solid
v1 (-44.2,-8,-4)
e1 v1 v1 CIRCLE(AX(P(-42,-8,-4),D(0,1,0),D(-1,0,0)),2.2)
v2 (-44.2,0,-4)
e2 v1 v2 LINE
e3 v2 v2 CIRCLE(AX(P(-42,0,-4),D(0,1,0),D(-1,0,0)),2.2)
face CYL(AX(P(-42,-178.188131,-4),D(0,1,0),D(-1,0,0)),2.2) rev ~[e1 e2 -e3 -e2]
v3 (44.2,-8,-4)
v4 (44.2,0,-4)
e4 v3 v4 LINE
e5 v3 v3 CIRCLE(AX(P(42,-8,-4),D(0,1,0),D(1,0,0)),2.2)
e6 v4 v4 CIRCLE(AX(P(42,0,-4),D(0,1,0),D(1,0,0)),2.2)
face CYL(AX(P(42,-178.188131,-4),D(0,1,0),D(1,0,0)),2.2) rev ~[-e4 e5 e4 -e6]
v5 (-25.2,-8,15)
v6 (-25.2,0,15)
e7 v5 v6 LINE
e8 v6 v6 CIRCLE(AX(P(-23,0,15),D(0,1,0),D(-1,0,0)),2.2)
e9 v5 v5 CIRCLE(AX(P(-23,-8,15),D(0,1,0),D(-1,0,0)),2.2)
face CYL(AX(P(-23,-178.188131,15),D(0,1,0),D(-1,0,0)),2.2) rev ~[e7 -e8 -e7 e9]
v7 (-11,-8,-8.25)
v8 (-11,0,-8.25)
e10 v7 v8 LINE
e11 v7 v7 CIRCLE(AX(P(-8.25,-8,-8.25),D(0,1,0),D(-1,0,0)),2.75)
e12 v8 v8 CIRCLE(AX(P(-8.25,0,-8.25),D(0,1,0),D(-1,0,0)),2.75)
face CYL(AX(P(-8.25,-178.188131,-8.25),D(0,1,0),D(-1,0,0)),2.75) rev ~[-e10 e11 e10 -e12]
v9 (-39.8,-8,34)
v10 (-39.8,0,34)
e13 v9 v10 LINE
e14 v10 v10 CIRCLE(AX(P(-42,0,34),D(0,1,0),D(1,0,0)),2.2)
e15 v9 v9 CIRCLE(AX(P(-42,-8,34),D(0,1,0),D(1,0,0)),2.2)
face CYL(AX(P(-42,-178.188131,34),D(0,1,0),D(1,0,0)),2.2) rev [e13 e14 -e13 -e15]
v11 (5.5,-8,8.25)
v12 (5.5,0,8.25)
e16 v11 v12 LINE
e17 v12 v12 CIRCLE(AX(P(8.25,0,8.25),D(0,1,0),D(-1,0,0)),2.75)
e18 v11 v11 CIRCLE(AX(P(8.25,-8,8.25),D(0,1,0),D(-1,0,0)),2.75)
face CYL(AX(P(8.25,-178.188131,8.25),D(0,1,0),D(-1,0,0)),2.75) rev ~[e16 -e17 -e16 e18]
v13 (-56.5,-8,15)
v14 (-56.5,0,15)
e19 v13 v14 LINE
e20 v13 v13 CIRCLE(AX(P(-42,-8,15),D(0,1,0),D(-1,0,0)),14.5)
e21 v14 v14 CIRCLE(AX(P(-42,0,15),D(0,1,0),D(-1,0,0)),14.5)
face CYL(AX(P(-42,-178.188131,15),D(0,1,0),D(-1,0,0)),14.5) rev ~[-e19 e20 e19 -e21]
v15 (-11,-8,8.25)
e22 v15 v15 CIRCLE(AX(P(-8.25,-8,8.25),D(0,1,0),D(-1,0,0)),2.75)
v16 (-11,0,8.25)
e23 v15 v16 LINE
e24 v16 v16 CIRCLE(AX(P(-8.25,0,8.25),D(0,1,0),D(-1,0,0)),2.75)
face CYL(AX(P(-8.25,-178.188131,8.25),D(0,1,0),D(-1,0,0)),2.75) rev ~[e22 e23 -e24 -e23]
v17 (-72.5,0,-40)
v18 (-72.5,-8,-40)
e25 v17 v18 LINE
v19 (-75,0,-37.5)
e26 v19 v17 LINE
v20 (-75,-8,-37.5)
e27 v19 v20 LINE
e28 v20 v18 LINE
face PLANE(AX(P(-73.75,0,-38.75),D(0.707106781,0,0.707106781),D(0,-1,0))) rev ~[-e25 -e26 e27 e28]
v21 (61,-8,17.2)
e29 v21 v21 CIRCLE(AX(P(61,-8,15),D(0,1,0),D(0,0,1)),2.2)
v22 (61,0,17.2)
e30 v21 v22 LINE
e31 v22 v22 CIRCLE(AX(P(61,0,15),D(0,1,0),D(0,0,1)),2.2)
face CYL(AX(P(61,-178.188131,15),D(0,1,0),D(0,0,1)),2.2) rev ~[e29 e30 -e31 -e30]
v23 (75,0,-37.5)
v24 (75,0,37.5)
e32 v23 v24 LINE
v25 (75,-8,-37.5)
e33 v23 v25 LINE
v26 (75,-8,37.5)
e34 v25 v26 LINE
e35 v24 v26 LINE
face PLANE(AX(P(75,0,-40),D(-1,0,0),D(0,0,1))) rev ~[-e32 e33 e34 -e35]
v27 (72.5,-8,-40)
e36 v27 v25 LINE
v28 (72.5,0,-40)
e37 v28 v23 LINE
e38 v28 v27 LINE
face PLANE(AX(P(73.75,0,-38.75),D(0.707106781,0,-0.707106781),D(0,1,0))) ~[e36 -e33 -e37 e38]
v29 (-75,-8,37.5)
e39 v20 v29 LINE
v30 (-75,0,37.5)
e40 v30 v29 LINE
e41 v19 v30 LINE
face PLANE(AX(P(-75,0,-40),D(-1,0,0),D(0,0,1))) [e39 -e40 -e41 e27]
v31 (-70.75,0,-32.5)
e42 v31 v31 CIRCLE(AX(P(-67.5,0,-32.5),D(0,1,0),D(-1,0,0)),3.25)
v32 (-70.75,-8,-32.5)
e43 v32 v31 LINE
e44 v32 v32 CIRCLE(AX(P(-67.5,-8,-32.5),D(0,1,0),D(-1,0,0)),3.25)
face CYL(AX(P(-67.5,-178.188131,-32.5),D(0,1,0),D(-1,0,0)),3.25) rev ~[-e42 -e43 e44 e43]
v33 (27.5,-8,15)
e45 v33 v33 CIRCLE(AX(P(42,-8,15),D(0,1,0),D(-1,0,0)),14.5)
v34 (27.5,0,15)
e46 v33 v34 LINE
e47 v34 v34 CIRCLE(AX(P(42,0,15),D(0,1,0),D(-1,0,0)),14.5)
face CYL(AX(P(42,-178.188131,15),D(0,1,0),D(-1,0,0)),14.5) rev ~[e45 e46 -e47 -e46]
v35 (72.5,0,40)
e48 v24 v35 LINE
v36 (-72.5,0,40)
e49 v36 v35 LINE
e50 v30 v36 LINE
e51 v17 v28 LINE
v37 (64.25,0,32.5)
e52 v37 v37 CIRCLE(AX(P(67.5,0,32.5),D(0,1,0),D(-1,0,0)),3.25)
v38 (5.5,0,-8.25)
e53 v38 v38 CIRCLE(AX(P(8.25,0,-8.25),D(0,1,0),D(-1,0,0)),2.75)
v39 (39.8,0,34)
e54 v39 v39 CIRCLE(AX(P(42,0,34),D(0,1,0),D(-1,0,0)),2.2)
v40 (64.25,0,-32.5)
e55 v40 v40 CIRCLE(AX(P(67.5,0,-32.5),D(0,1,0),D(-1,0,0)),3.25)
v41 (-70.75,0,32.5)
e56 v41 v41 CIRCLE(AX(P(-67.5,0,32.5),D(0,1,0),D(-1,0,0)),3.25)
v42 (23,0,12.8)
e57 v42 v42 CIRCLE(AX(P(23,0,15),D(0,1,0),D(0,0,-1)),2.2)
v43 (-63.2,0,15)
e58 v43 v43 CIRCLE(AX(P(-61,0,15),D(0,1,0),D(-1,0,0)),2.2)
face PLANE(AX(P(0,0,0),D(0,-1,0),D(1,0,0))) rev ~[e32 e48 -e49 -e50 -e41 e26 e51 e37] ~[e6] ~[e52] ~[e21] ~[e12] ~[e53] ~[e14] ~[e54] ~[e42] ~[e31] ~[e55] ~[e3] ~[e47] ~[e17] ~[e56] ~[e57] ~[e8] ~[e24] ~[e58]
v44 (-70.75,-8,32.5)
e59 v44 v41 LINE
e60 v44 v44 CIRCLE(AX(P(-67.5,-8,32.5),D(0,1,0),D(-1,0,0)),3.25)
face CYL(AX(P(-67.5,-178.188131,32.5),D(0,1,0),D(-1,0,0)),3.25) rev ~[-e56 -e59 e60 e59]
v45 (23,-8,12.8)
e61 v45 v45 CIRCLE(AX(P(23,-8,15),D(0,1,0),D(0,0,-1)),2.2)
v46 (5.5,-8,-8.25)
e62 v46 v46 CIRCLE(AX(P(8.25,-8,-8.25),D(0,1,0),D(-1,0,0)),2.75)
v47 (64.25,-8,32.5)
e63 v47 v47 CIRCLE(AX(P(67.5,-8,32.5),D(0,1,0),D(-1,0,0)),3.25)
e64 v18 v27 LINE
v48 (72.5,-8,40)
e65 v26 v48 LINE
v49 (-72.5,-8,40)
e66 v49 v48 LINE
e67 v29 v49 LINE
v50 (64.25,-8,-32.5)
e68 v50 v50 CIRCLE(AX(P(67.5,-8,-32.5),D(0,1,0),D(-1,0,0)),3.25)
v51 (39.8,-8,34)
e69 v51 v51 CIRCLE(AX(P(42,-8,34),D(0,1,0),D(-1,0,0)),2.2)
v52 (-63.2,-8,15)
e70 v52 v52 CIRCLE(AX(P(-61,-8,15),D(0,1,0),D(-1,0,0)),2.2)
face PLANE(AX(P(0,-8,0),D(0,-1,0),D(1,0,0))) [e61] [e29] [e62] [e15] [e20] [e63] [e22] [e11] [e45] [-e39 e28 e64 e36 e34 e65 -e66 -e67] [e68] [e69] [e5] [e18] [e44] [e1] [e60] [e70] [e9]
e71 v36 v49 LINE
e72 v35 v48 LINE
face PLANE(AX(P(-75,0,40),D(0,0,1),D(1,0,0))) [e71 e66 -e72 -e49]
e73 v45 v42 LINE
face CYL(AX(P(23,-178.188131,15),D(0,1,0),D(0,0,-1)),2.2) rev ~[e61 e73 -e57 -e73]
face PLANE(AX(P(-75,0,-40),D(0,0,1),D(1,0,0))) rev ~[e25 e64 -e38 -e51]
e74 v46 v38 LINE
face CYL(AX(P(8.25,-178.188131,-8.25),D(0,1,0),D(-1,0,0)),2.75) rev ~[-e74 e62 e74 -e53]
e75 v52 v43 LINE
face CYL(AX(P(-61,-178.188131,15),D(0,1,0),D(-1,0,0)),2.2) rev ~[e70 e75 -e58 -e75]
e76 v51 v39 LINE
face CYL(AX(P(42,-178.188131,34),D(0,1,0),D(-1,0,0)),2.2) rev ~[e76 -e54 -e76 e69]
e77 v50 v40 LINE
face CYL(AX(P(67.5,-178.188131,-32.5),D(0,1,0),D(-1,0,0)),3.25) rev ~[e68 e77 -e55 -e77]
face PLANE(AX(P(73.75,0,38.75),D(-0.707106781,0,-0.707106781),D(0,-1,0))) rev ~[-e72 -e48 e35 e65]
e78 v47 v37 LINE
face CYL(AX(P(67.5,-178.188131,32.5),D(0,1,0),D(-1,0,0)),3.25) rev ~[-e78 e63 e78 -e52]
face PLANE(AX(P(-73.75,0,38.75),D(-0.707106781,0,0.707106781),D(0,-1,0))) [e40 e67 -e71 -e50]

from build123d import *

# Parameters (mm, degrees)
F0_W             = 150
F0_H             = 80
F1_DEPTH         = 8
F2_SIZE          = 2.5
F4_D             = 4.4
F4_COPIES_COUNT  = 4
F4_COPIES2_COUNT = 2
F4_COPIES2_PITCH = 104.737768
F4_COPIES3_COUNT = 2
F4_COPIES3_PITCH = 92.195445
F4_COPIES4_COUNT = 2
F4_COPIES4_PITCH = 67.720012
F5_D             = 6.5
F6_D             = 5.5
F7_D             = 29


# Not quite as in the source:
# - a pattern or mirror of a feature is missing from the dataset's text; its kind, count and spacing are read off the source's solid


with BuildPart() as f1:
    # F0 (on Front) → F1 (new body)
    with BuildSketch(Plane.XZ):
        Rectangle(F0_W, F0_H)
    extrude(amount=F1_DEPTH)

    # F2
    f2_edges = [f1.edges().sort_by_distance(p)[0] for p in [
        (75, -4, 40),
        (75, -4, -40),
        (-75, -4, 40),
        (-75, -4, -40),
    ]]
    chamfer(f2_edges, length=F2_SIZE)

    # F4 (through all)
    with Locations(Plane.XZ.offset(8)):
        with Locations((42, 34)):
            f4 = Hole(F4_D / 2)

    # F4_copies: F4 ×4 about axis
    f4_copies_axis = Axis((42, 0, 15), (0, 1, 0))
    for i in range(1, F4_COPIES_COUNT):
        add(f4.rotate(f4_copies_axis, i * 360 / F4_COPIES_COUNT), mode=Mode.SUBTRACT)

    # F4_copies1: F4 across plane
    add(f4.mirror(Plane(origin=(0, 0, 0), x_dir=(0, 0, -1), z_dir=(-1, 0, 0))), mode=Mode.SUBTRACT)

    # F4_copies2: F4 ×2
    with Locations(*[Vector(-0.9834083939, 0, -0.1814054319) * (i * F4_COPIES2_PITCH) for i in range(1, F4_COPIES2_COUNT)]):
        add(f4, mode=Mode.SUBTRACT)

    # F4_copies3: F4 ×2
    with Locations(*[Vector(-0.9111079228, 0, -0.4121678699) * (i * F4_COPIES3_PITCH) for i in range(1, F4_COPIES3_COUNT)]):
        add(f4, mode=Mode.SUBTRACT)

    # F4_copies4: F4 ×2
    with Locations(*[Vector(-0.9598344457, 0, -0.2805669918) * (i * F4_COPIES4_PITCH) for i in range(1, F4_COPIES4_COUNT)]):
        add(f4, mode=Mode.SUBTRACT)

    # F5 (through all)
    with Locations(Plane.XZ.offset(8)):
        with Locations((67.5, 32.5), (67.5, -32.5), (-67.5, -32.5), (-67.5, 32.5)):
            Hole(F5_D / 2)

    # F6 (through all)
    with Locations(Plane.XZ.offset(8)):
        with Locations((-8.25, -8.25), (8.25, -8.25), (8.25, 8.25), (-8.25, 8.25)):
            Hole(F6_D / 2)

    # F7 (through all)
    with Locations(Plane.XZ.offset(8)):
        with Locations((-42, 15), (42, 15)):
            Hole(F7_D / 2)


solid = f1.part
